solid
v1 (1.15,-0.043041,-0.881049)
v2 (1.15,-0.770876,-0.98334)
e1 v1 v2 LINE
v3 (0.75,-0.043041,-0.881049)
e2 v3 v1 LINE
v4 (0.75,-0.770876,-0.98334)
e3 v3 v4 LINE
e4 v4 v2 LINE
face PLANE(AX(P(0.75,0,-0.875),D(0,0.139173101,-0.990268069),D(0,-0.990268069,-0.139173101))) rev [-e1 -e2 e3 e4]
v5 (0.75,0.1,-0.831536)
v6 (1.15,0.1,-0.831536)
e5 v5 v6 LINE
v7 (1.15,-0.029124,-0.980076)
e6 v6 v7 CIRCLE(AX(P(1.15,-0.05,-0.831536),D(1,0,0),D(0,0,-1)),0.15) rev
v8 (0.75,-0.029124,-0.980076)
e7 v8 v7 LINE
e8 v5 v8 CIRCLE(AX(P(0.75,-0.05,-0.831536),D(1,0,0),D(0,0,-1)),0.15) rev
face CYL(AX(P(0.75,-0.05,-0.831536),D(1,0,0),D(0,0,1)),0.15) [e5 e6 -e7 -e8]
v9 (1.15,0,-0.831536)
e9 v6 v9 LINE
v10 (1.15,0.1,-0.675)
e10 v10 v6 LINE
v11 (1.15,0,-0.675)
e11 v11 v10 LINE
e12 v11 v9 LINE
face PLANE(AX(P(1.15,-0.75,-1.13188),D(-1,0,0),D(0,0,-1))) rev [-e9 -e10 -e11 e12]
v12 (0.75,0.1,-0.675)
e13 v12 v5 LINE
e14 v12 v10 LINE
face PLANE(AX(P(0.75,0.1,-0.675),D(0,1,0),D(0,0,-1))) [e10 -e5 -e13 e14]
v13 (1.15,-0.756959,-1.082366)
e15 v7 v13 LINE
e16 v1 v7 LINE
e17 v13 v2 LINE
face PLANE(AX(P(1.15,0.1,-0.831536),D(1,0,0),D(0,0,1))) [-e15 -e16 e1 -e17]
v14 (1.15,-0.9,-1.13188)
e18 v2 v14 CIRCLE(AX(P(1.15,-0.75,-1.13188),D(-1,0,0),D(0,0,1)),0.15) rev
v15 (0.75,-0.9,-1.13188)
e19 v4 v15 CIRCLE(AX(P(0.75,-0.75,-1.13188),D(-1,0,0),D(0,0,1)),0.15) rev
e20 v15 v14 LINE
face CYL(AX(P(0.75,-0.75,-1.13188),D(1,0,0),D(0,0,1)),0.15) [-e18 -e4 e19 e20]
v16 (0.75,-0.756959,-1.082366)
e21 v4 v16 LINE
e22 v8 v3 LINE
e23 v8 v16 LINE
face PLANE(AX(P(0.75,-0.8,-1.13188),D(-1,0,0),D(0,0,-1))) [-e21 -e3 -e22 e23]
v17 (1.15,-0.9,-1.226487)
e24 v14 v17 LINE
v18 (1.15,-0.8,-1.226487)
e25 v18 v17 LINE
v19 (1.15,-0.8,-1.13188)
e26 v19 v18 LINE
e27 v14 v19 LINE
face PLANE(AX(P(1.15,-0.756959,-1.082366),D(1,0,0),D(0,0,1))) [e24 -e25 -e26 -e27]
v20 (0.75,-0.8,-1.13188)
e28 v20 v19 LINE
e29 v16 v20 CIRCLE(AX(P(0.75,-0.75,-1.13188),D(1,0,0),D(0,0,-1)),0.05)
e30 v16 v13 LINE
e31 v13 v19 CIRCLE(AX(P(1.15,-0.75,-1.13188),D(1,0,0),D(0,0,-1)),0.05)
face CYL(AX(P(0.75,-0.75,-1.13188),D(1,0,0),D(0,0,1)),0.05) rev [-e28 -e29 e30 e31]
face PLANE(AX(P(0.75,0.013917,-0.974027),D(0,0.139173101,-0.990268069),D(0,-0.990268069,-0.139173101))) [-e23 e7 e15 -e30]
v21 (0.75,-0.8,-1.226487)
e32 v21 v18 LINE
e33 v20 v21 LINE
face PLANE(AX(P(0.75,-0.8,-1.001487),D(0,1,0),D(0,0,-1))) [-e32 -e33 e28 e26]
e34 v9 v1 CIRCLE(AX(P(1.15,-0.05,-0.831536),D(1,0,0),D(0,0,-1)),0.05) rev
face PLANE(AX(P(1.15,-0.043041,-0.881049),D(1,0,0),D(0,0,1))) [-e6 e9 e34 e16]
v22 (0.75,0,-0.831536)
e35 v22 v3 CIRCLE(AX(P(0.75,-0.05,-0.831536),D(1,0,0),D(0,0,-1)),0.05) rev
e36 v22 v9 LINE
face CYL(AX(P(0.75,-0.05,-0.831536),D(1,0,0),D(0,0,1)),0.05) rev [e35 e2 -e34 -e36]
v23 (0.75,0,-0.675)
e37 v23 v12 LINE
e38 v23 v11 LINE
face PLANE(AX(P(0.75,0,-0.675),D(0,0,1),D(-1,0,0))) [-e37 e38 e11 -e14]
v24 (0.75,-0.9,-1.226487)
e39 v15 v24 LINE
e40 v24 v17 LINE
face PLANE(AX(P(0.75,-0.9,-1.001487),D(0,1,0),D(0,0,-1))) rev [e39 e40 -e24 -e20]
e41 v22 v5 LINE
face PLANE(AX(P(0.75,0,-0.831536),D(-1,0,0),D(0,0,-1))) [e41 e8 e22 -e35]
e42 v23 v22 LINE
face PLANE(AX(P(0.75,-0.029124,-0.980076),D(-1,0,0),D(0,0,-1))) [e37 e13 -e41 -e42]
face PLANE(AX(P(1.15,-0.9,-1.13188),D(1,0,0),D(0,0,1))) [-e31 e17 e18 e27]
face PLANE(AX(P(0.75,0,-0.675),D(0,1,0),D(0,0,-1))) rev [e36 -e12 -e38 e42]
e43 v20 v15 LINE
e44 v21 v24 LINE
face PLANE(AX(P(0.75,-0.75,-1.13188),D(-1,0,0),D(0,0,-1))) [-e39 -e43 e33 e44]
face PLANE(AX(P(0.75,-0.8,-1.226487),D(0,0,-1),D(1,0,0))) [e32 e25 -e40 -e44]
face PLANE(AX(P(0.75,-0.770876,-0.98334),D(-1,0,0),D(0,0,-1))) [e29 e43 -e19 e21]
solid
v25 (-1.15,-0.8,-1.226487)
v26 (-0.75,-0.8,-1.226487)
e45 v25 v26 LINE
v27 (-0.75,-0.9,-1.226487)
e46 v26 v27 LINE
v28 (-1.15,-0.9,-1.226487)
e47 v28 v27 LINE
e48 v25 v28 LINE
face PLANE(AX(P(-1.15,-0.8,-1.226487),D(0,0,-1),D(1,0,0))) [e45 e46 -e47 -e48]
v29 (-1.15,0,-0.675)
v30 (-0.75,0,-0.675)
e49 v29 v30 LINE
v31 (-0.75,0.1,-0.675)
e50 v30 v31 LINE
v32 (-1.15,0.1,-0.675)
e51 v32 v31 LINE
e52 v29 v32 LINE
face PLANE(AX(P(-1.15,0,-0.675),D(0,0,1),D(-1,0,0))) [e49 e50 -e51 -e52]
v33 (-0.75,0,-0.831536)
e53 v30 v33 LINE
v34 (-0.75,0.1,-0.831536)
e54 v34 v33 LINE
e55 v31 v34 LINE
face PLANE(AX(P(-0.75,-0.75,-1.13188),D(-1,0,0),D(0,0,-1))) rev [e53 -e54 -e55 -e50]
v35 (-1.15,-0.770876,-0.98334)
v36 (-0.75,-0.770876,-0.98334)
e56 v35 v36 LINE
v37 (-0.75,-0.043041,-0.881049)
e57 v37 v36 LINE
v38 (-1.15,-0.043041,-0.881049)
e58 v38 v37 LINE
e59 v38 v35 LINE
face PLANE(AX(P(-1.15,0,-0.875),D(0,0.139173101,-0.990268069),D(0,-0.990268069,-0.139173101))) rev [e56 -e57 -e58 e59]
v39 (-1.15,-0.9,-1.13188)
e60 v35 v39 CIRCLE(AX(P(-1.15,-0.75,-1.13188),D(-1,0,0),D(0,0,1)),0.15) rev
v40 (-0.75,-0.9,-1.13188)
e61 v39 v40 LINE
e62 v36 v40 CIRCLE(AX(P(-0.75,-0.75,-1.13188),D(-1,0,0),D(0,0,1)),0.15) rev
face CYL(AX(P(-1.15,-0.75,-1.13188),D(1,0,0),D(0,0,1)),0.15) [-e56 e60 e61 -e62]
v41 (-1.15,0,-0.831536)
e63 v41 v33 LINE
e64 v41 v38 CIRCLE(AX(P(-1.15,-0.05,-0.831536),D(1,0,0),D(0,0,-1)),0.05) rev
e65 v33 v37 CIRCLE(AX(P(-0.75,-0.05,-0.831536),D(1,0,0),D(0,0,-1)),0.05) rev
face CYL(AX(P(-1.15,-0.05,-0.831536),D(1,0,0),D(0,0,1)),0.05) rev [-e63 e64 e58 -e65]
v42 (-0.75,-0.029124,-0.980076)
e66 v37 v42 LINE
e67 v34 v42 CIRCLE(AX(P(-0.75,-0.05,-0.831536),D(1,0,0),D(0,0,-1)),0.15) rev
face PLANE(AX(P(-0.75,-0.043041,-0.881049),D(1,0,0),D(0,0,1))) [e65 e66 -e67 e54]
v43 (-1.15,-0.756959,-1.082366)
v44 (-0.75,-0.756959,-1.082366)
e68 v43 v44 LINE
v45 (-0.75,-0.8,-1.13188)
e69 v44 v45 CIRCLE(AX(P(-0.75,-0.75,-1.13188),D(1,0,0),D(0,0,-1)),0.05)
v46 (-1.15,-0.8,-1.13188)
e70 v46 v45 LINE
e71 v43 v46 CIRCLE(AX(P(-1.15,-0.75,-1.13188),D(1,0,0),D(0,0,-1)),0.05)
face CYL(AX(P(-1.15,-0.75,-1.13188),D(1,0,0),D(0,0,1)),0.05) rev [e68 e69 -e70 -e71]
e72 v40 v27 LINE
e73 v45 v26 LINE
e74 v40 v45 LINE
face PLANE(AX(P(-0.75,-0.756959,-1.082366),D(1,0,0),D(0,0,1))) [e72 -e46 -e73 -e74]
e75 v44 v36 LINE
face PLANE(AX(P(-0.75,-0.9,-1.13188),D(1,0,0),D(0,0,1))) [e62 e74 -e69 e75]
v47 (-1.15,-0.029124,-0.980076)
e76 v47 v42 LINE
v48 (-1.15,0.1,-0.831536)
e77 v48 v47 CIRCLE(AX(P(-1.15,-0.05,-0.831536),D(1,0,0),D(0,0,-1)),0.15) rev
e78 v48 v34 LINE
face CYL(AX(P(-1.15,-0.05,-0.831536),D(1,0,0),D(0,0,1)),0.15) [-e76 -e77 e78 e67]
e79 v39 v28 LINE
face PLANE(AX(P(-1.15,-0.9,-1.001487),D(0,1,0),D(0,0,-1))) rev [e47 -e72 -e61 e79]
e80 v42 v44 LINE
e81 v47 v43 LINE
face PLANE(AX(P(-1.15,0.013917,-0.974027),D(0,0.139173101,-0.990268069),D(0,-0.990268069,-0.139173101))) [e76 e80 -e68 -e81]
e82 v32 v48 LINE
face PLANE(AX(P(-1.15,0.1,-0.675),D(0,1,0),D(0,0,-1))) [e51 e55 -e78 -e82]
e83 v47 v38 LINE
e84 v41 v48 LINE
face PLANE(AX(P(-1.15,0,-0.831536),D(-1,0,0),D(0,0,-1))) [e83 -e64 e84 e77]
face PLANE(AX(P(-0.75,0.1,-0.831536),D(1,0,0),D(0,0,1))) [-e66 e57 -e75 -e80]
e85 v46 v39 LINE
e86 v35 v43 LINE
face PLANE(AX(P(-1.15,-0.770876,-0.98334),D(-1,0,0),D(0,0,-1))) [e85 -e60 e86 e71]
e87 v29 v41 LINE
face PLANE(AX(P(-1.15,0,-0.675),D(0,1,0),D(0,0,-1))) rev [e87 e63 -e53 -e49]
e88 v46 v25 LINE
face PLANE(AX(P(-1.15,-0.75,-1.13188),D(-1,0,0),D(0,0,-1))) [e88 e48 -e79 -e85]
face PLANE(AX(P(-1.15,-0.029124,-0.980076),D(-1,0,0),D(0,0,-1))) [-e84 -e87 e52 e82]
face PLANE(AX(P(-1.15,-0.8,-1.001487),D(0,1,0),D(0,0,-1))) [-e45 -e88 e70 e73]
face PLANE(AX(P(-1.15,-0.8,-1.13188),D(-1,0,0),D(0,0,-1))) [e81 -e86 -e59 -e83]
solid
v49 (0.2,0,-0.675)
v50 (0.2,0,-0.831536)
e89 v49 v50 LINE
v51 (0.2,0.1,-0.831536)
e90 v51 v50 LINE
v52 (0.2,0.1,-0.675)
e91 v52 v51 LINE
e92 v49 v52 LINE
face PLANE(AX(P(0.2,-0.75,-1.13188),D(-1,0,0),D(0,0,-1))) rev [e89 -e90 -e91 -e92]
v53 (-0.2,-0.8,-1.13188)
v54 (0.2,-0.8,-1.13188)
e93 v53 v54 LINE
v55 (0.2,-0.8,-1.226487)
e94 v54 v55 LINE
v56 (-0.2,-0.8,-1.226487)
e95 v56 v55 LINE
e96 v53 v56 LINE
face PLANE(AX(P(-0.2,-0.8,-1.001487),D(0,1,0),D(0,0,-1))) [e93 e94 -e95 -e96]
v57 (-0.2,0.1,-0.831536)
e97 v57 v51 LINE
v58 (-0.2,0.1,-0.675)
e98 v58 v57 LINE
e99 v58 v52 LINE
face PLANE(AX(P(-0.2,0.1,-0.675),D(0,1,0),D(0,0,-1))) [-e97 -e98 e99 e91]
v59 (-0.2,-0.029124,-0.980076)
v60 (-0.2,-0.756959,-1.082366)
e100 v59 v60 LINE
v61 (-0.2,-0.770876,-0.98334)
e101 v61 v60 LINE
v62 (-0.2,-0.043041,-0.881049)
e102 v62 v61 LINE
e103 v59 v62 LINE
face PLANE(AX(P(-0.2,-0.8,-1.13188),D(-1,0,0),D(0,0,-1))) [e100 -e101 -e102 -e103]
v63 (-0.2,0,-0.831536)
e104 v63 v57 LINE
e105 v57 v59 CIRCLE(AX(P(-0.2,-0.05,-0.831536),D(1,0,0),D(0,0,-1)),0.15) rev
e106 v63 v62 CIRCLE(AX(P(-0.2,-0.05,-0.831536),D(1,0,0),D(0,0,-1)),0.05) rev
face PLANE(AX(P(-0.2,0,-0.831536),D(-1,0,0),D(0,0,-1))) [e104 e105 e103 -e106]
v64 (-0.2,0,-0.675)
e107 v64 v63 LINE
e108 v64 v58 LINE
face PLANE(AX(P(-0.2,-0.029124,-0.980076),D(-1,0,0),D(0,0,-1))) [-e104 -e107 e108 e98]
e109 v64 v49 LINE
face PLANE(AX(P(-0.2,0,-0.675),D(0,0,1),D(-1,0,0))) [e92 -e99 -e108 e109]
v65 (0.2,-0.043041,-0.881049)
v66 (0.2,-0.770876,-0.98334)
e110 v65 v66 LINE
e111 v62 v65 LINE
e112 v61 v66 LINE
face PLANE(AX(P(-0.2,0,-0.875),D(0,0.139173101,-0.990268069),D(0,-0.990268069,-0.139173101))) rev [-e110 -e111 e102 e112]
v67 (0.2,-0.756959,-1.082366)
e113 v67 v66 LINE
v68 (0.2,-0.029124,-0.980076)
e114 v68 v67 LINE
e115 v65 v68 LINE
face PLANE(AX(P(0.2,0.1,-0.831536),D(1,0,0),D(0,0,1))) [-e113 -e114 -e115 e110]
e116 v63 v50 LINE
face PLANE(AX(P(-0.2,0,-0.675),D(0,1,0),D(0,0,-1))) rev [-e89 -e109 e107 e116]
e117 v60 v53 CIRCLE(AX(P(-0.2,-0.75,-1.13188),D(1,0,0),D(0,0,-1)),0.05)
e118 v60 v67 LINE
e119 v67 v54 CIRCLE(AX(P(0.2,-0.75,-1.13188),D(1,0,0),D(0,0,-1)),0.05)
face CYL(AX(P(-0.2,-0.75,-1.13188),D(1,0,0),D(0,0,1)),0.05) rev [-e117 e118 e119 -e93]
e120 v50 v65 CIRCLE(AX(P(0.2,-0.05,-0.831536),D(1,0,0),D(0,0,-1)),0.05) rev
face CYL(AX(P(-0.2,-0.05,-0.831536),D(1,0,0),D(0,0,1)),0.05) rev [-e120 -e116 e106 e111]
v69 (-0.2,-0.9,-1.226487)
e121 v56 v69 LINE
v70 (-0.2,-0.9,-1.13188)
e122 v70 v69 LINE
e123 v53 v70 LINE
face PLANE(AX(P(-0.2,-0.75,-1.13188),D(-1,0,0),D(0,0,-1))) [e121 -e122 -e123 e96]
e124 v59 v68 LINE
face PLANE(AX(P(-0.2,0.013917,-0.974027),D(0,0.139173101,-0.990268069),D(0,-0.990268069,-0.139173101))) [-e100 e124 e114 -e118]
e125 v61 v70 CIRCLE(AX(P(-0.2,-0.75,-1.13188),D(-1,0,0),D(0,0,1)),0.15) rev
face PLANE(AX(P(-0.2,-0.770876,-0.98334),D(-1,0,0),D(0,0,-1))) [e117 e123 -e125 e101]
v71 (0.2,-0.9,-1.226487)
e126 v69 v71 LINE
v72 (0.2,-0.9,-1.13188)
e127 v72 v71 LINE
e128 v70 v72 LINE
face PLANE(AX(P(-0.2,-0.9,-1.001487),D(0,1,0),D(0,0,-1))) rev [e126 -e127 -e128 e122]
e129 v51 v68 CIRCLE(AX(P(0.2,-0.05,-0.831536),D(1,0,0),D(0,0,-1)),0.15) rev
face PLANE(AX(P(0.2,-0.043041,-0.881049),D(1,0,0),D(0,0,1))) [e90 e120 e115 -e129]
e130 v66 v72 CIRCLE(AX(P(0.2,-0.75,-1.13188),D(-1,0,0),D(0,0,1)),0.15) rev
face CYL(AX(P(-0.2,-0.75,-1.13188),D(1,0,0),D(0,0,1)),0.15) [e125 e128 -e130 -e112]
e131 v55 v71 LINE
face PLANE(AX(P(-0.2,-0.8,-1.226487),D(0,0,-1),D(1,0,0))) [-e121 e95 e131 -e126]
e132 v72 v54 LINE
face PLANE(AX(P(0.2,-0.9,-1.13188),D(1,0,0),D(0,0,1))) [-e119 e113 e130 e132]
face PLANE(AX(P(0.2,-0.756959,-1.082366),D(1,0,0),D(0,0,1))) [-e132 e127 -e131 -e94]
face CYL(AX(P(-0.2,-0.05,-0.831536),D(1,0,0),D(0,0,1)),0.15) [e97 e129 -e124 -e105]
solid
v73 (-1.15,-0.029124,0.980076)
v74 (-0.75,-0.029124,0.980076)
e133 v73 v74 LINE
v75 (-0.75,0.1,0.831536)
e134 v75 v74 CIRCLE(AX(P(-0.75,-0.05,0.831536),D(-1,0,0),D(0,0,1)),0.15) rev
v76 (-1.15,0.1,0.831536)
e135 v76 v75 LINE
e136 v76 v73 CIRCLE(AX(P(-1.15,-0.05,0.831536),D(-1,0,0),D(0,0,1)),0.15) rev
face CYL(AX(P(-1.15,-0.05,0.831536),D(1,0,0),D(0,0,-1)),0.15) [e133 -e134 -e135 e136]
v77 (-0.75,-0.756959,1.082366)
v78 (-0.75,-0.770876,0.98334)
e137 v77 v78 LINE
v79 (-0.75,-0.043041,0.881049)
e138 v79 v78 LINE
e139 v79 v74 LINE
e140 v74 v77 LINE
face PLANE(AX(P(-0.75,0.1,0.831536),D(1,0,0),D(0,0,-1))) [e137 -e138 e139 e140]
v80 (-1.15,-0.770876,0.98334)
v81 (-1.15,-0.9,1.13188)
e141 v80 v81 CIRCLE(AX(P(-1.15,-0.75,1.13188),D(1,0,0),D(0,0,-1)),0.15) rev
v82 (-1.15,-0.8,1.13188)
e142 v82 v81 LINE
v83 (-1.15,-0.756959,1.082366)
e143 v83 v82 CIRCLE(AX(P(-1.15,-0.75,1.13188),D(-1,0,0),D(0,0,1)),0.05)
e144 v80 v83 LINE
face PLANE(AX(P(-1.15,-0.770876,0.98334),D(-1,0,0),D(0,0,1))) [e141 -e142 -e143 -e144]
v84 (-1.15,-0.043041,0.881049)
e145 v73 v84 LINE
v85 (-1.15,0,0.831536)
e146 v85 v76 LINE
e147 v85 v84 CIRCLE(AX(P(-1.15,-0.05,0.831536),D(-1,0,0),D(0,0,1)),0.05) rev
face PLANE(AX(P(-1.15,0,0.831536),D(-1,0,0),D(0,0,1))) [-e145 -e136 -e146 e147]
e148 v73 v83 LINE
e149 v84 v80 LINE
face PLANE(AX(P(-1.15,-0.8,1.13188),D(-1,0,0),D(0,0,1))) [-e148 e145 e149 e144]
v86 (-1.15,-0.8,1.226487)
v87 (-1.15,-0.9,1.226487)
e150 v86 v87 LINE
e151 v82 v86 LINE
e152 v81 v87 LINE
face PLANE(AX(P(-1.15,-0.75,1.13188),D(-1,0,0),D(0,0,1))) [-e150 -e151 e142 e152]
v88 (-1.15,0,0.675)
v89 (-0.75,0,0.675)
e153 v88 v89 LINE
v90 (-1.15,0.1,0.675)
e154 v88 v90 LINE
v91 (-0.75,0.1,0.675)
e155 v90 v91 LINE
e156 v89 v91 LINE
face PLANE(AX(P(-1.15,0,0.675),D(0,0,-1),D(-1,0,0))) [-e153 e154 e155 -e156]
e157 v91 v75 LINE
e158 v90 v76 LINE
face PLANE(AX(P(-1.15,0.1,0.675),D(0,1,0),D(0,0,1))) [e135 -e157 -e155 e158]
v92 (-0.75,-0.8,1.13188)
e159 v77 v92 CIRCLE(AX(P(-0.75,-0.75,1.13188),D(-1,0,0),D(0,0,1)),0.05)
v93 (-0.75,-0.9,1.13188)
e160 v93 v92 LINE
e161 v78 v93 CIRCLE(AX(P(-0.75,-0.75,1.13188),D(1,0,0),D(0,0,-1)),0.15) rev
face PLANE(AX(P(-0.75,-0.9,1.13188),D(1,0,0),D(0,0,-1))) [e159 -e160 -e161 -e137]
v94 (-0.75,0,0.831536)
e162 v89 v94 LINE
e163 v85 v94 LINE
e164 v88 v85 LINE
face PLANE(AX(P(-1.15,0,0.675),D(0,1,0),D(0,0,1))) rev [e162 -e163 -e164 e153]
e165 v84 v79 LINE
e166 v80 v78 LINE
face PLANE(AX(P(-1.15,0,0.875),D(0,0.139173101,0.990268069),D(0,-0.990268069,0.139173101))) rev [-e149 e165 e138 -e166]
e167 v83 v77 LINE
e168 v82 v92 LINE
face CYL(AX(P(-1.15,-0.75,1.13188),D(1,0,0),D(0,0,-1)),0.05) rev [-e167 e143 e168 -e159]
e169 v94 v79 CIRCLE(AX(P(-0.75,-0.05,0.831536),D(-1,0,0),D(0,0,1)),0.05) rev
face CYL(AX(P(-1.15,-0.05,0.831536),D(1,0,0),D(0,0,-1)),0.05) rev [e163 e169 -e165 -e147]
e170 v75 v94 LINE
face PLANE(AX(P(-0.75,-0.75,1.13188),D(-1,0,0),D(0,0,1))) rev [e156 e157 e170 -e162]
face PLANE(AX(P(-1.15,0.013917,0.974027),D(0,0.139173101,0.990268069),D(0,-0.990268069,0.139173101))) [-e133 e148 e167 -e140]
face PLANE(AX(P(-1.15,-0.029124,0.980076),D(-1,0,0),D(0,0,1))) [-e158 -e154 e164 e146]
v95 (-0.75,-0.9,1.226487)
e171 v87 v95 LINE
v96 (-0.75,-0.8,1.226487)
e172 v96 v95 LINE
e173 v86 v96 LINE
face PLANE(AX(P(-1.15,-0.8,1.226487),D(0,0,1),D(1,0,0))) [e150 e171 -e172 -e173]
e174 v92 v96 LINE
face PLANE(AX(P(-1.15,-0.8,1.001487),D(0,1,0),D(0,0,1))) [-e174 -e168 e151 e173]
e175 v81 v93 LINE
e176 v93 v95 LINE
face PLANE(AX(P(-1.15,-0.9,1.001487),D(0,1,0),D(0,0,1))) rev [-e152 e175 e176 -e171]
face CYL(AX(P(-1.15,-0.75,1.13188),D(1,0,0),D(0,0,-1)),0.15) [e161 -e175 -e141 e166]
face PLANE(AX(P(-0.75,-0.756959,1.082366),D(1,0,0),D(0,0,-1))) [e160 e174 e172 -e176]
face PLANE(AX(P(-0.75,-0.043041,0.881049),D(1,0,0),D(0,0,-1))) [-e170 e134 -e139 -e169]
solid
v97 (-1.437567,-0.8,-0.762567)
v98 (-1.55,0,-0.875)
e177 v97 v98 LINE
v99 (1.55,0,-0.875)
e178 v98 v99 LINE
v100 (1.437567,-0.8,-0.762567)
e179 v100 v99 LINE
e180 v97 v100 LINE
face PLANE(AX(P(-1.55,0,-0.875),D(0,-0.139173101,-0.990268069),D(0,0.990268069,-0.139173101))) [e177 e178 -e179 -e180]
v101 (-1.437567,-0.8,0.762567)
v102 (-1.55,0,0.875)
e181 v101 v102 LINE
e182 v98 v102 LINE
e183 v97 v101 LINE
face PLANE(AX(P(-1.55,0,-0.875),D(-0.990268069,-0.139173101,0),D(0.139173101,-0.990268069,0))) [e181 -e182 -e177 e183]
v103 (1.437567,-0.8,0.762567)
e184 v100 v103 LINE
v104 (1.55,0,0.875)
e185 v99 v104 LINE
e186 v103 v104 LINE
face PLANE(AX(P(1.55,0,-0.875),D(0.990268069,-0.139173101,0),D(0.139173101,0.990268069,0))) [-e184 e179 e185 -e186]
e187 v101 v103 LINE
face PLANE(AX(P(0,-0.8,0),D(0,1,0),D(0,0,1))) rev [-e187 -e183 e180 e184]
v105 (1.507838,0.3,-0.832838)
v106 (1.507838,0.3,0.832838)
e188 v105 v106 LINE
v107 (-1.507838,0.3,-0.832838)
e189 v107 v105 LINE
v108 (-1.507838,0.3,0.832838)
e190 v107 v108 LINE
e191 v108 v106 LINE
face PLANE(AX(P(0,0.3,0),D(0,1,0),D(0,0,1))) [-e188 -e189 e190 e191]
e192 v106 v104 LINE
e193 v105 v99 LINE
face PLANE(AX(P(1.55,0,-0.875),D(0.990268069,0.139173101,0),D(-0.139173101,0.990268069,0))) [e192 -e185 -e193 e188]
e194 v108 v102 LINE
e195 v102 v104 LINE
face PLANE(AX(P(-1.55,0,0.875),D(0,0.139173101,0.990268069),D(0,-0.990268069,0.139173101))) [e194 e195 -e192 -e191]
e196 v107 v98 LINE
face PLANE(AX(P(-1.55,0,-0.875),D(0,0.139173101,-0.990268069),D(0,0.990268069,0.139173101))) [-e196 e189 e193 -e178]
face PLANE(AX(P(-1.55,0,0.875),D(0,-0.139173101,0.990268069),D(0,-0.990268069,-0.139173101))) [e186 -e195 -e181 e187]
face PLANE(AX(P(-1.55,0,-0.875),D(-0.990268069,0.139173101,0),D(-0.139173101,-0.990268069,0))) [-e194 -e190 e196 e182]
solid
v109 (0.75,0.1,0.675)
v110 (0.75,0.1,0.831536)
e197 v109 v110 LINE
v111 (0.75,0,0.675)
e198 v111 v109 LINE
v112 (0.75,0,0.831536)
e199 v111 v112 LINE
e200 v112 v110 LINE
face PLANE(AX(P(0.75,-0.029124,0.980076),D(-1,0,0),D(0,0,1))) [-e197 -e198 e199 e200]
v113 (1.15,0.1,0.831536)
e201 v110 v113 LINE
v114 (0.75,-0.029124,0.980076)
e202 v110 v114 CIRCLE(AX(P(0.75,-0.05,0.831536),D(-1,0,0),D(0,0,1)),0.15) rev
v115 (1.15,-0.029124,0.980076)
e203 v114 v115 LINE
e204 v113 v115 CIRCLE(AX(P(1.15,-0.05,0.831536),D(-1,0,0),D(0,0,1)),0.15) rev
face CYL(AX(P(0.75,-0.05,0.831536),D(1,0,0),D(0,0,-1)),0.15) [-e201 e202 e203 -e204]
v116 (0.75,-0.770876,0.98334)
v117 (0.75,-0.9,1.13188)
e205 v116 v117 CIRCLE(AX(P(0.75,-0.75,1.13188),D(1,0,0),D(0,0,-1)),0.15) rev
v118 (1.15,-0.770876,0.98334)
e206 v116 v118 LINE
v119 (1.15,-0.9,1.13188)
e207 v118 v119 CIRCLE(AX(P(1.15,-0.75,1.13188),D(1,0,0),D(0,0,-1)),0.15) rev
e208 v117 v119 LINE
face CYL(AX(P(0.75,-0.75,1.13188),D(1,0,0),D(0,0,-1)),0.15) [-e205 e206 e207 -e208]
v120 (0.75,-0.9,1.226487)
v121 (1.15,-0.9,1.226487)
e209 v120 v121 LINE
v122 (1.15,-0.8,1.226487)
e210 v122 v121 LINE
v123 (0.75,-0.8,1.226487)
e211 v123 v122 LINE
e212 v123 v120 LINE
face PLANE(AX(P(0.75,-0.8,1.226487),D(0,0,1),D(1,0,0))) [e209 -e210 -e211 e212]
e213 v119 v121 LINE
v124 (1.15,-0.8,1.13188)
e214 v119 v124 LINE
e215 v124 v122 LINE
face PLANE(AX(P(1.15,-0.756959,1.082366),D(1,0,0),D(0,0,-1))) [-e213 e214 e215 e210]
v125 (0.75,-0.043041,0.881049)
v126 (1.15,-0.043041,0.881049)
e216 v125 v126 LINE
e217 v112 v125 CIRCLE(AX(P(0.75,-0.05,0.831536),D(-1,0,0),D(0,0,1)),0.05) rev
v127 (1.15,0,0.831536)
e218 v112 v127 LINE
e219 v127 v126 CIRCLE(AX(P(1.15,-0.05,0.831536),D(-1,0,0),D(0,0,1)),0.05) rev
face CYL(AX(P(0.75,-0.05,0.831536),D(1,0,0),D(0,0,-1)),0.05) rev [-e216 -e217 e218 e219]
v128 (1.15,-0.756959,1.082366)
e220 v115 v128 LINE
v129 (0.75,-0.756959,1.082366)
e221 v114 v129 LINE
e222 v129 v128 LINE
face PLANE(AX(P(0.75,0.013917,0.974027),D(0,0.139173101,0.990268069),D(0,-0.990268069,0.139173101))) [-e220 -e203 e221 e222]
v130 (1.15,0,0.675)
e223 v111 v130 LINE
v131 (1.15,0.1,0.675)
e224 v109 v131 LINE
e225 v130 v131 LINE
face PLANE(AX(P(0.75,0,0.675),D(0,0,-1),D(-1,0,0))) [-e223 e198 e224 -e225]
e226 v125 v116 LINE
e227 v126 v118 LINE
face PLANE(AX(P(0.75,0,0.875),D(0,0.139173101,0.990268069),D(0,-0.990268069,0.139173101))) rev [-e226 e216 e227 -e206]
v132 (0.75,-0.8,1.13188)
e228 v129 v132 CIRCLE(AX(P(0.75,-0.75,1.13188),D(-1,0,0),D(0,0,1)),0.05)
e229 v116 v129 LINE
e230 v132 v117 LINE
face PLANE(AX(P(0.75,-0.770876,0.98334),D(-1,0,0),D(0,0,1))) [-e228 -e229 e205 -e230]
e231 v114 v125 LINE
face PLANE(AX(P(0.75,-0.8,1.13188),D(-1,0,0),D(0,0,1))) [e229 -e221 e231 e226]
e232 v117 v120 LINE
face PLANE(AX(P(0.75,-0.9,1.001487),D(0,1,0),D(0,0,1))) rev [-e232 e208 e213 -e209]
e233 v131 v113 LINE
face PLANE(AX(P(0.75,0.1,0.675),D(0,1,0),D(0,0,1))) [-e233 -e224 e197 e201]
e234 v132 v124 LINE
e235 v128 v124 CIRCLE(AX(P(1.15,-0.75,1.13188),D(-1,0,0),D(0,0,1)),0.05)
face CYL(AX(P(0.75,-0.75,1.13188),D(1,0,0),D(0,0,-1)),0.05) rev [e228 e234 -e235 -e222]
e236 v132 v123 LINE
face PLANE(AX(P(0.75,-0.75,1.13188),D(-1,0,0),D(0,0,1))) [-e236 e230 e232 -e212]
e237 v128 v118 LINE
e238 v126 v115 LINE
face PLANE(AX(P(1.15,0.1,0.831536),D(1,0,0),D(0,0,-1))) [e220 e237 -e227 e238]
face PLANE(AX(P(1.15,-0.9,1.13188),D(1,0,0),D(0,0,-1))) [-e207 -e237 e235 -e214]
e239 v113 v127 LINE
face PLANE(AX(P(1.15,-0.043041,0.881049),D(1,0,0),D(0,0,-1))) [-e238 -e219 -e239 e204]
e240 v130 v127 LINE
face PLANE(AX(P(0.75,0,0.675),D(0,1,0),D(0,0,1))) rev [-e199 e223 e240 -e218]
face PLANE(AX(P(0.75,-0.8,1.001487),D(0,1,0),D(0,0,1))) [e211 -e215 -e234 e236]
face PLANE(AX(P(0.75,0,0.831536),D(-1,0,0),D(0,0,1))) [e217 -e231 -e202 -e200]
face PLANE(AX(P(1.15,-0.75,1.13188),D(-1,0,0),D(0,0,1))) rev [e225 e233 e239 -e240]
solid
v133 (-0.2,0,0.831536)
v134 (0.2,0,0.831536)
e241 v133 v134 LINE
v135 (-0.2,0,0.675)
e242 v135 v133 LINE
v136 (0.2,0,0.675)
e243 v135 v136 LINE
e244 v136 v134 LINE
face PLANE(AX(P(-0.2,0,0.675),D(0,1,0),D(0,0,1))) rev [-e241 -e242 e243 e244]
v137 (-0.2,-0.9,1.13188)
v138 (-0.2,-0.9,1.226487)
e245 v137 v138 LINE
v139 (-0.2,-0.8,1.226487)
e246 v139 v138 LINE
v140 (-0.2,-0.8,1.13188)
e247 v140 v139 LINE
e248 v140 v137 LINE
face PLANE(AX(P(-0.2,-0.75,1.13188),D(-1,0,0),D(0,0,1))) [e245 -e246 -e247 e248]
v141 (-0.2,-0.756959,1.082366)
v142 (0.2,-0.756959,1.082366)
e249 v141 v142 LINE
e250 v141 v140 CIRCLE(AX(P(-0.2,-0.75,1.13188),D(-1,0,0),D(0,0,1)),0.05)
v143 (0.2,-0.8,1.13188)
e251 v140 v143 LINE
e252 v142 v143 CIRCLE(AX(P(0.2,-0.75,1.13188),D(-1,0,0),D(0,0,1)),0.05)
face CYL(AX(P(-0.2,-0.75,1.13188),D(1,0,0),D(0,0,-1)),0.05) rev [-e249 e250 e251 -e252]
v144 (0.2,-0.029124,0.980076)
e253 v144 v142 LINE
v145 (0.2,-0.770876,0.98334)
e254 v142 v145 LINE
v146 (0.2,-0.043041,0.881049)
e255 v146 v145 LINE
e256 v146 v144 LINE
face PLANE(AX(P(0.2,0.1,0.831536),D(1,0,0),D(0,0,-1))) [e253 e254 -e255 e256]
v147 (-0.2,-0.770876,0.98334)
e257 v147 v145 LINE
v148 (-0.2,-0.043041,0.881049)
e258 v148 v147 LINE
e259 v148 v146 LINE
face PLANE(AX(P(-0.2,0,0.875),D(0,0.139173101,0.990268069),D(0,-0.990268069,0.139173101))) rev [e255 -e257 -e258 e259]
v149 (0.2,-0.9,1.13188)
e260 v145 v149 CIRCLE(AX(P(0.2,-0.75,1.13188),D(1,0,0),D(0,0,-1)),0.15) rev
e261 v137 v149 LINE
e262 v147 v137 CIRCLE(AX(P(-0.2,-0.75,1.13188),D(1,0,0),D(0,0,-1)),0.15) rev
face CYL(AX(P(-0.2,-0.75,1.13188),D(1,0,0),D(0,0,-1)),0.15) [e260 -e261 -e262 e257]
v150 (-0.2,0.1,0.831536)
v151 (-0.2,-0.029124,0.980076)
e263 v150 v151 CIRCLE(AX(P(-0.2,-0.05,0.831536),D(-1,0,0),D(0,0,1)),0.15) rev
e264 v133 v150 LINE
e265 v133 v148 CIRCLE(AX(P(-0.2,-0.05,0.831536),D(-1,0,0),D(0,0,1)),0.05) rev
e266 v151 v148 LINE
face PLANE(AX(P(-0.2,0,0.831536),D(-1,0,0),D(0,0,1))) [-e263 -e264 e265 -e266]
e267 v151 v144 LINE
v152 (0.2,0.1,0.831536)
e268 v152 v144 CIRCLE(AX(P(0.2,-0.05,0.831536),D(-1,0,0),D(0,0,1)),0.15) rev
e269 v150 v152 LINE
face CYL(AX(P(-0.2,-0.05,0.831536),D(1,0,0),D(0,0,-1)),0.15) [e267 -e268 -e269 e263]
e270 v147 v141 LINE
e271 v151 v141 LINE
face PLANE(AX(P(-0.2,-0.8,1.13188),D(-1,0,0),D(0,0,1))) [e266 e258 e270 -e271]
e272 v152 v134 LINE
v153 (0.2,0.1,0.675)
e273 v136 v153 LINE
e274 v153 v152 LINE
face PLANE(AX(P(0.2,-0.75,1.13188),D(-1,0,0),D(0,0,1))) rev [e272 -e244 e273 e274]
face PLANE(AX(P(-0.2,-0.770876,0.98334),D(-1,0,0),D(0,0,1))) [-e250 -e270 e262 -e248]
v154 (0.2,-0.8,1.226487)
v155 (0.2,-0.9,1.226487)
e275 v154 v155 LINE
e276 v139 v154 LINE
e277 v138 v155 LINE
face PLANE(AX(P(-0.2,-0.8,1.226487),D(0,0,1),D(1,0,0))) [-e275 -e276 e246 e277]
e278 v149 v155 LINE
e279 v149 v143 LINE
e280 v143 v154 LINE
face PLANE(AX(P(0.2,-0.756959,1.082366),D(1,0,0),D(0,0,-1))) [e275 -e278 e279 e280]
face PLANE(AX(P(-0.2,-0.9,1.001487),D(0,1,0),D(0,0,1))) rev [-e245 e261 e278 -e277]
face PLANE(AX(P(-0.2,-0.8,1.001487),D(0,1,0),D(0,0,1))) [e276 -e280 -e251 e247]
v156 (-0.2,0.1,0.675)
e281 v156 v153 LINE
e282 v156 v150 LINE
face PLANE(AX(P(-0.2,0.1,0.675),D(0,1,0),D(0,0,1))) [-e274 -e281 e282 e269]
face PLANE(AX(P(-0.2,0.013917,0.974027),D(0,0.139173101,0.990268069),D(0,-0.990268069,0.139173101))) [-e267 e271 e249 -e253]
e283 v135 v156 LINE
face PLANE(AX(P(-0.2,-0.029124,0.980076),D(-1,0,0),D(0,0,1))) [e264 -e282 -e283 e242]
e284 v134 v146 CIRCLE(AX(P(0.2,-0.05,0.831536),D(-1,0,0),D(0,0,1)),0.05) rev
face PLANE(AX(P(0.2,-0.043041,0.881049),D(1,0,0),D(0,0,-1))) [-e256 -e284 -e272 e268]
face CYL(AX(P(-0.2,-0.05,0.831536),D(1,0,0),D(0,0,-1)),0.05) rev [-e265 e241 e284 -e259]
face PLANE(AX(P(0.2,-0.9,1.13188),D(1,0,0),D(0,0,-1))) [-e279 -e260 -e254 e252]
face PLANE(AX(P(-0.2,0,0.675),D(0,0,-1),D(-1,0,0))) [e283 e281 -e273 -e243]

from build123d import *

# Parameters (mm, degrees)
SKETCH1_W                     = 3.1
SKETCH1_H                     = 1.75
BOSS_EXTRUDE1_DEPTH           = 0.3
BOSS_EXTRUDE1_TAPER           = 8
BOSS_EXTRUDE1_OTHER_WAY_DEPTH = 0.8
BOSS_EXTRUDE1_OTHER_WAY_TAPER = 8
BASE_FLANGE2_DEPTH            = 0.2
LPATTERN1_COUNT               = 2
LPATTERN1_PITCH               = 0.95
LPATTERN1_2_COUNT             = 2
LPATTERN1_2_PITCH             = 0.95


# Sheet-metal steps are written as plain solids
with BuildPart() as part:
    # Sketch1 → Boss-Extrude1 (new body)
    with BuildSketch(Plane(origin=(0, 0, 0), x_dir=(1, 0, 0), z_dir=(0, 1, 0))):
        Rectangle(SKETCH1_W, SKETCH1_H)
    extrude(amount=BOSS_EXTRUDE1_DEPTH, taper=BOSS_EXTRUDE1_TAPER)

    # Sketch1 → Boss-Extrude1 other way (add)
    with BuildSketch(Plane(origin=(0, 0, 0), x_dir=(1, 0, 0), z_dir=(0, 1, 0))):
        Rectangle(SKETCH1_W, SKETCH1_H)
    extrude(amount=-BOSS_EXTRUDE1_OTHER_WAY_DEPTH, taper=BOSS_EXTRUDE1_OTHER_WAY_TAPER)


with BuildPart() as body_2:
    # Sketch2 → Base-Flange2 (new, symmetric)
    with BuildSketch(Plane.ZY):
        with BuildLine():
            Line((0.675, 0), (0.831535663, 0))
            ThreePointArc((0.831535663, 0), (0.864338615, -0.012264521), (0.881049067, -0.043041345))
            Line((0.881049067, -0.043041345), (0.983339552, -0.770875965))
            ThreePointArc((0.983339552, -0.770875965), (1.033470908, -0.863206437), (1.131879762, -0.9))
            Line((1.131879762, -0.9), (1.226486751, -0.9))
            Line((1.226486751, -0.9), (1.226486751, -0.8))
            Line((1.226486751, -0.8), (1.131879762, -0.8))
            ThreePointArc((1.131879762, -0.8), (1.09907681, -0.787735479), (1.082366358, -0.756958655))
            Line((1.082366358, -0.756958655), (0.980075873, -0.029124035))
            ThreePointArc((0.980075873, -0.029124035), (0.929944517, 0.063206437), (0.831535663, 0.1))
            Line((0.831535663, 0.1), (0.675, 0.1))
            Line((0.675, 0.1), (0.675, 0))
        make_face()
    extrude(amount=BASE_FLANGE2_DEPTH, both=True)


with BuildPart() as lpattern1_1:
    # LPattern1: pattern copy
    add(body_2.part.moved(Location(Vector(1, 0, 0) * (1 * LPATTERN1_PITCH))))


with BuildPart() as lpattern1_2_1:
    # LPattern1 2: pattern copy
    add(body_2.part.moved(Location(Vector(-1, 0, 0) * (1 * LPATTERN1_2_PITCH))))


with BuildPart() as body_5:
    # Mirror1: mirrored copy
    add(lpattern1_2_1.part.mirror(Plane(origin=(0, 0, 0), x_dir=(1, 0, 0), z_dir=(0, 0, -1))))


with BuildPart() as body_6:
    # Mirror1 2: mirrored copy
    add(body_2.part.mirror(Plane(origin=(0, 0, 0), x_dir=(1, 0, 0), z_dir=(0, 0, -1))))


with BuildPart() as body_7:
    # Mirror1 3: mirrored copy
    add(lpattern1_1.part.mirror(Plane(origin=(0, 0, 0), x_dir=(1, 0, 0), z_dir=(0, 0, -1))))


solid = Compound([part.part, body_2.part, lpattern1_1.part, lpattern1_2_1.part, body_5.part, body_6.part, body_7.part])
